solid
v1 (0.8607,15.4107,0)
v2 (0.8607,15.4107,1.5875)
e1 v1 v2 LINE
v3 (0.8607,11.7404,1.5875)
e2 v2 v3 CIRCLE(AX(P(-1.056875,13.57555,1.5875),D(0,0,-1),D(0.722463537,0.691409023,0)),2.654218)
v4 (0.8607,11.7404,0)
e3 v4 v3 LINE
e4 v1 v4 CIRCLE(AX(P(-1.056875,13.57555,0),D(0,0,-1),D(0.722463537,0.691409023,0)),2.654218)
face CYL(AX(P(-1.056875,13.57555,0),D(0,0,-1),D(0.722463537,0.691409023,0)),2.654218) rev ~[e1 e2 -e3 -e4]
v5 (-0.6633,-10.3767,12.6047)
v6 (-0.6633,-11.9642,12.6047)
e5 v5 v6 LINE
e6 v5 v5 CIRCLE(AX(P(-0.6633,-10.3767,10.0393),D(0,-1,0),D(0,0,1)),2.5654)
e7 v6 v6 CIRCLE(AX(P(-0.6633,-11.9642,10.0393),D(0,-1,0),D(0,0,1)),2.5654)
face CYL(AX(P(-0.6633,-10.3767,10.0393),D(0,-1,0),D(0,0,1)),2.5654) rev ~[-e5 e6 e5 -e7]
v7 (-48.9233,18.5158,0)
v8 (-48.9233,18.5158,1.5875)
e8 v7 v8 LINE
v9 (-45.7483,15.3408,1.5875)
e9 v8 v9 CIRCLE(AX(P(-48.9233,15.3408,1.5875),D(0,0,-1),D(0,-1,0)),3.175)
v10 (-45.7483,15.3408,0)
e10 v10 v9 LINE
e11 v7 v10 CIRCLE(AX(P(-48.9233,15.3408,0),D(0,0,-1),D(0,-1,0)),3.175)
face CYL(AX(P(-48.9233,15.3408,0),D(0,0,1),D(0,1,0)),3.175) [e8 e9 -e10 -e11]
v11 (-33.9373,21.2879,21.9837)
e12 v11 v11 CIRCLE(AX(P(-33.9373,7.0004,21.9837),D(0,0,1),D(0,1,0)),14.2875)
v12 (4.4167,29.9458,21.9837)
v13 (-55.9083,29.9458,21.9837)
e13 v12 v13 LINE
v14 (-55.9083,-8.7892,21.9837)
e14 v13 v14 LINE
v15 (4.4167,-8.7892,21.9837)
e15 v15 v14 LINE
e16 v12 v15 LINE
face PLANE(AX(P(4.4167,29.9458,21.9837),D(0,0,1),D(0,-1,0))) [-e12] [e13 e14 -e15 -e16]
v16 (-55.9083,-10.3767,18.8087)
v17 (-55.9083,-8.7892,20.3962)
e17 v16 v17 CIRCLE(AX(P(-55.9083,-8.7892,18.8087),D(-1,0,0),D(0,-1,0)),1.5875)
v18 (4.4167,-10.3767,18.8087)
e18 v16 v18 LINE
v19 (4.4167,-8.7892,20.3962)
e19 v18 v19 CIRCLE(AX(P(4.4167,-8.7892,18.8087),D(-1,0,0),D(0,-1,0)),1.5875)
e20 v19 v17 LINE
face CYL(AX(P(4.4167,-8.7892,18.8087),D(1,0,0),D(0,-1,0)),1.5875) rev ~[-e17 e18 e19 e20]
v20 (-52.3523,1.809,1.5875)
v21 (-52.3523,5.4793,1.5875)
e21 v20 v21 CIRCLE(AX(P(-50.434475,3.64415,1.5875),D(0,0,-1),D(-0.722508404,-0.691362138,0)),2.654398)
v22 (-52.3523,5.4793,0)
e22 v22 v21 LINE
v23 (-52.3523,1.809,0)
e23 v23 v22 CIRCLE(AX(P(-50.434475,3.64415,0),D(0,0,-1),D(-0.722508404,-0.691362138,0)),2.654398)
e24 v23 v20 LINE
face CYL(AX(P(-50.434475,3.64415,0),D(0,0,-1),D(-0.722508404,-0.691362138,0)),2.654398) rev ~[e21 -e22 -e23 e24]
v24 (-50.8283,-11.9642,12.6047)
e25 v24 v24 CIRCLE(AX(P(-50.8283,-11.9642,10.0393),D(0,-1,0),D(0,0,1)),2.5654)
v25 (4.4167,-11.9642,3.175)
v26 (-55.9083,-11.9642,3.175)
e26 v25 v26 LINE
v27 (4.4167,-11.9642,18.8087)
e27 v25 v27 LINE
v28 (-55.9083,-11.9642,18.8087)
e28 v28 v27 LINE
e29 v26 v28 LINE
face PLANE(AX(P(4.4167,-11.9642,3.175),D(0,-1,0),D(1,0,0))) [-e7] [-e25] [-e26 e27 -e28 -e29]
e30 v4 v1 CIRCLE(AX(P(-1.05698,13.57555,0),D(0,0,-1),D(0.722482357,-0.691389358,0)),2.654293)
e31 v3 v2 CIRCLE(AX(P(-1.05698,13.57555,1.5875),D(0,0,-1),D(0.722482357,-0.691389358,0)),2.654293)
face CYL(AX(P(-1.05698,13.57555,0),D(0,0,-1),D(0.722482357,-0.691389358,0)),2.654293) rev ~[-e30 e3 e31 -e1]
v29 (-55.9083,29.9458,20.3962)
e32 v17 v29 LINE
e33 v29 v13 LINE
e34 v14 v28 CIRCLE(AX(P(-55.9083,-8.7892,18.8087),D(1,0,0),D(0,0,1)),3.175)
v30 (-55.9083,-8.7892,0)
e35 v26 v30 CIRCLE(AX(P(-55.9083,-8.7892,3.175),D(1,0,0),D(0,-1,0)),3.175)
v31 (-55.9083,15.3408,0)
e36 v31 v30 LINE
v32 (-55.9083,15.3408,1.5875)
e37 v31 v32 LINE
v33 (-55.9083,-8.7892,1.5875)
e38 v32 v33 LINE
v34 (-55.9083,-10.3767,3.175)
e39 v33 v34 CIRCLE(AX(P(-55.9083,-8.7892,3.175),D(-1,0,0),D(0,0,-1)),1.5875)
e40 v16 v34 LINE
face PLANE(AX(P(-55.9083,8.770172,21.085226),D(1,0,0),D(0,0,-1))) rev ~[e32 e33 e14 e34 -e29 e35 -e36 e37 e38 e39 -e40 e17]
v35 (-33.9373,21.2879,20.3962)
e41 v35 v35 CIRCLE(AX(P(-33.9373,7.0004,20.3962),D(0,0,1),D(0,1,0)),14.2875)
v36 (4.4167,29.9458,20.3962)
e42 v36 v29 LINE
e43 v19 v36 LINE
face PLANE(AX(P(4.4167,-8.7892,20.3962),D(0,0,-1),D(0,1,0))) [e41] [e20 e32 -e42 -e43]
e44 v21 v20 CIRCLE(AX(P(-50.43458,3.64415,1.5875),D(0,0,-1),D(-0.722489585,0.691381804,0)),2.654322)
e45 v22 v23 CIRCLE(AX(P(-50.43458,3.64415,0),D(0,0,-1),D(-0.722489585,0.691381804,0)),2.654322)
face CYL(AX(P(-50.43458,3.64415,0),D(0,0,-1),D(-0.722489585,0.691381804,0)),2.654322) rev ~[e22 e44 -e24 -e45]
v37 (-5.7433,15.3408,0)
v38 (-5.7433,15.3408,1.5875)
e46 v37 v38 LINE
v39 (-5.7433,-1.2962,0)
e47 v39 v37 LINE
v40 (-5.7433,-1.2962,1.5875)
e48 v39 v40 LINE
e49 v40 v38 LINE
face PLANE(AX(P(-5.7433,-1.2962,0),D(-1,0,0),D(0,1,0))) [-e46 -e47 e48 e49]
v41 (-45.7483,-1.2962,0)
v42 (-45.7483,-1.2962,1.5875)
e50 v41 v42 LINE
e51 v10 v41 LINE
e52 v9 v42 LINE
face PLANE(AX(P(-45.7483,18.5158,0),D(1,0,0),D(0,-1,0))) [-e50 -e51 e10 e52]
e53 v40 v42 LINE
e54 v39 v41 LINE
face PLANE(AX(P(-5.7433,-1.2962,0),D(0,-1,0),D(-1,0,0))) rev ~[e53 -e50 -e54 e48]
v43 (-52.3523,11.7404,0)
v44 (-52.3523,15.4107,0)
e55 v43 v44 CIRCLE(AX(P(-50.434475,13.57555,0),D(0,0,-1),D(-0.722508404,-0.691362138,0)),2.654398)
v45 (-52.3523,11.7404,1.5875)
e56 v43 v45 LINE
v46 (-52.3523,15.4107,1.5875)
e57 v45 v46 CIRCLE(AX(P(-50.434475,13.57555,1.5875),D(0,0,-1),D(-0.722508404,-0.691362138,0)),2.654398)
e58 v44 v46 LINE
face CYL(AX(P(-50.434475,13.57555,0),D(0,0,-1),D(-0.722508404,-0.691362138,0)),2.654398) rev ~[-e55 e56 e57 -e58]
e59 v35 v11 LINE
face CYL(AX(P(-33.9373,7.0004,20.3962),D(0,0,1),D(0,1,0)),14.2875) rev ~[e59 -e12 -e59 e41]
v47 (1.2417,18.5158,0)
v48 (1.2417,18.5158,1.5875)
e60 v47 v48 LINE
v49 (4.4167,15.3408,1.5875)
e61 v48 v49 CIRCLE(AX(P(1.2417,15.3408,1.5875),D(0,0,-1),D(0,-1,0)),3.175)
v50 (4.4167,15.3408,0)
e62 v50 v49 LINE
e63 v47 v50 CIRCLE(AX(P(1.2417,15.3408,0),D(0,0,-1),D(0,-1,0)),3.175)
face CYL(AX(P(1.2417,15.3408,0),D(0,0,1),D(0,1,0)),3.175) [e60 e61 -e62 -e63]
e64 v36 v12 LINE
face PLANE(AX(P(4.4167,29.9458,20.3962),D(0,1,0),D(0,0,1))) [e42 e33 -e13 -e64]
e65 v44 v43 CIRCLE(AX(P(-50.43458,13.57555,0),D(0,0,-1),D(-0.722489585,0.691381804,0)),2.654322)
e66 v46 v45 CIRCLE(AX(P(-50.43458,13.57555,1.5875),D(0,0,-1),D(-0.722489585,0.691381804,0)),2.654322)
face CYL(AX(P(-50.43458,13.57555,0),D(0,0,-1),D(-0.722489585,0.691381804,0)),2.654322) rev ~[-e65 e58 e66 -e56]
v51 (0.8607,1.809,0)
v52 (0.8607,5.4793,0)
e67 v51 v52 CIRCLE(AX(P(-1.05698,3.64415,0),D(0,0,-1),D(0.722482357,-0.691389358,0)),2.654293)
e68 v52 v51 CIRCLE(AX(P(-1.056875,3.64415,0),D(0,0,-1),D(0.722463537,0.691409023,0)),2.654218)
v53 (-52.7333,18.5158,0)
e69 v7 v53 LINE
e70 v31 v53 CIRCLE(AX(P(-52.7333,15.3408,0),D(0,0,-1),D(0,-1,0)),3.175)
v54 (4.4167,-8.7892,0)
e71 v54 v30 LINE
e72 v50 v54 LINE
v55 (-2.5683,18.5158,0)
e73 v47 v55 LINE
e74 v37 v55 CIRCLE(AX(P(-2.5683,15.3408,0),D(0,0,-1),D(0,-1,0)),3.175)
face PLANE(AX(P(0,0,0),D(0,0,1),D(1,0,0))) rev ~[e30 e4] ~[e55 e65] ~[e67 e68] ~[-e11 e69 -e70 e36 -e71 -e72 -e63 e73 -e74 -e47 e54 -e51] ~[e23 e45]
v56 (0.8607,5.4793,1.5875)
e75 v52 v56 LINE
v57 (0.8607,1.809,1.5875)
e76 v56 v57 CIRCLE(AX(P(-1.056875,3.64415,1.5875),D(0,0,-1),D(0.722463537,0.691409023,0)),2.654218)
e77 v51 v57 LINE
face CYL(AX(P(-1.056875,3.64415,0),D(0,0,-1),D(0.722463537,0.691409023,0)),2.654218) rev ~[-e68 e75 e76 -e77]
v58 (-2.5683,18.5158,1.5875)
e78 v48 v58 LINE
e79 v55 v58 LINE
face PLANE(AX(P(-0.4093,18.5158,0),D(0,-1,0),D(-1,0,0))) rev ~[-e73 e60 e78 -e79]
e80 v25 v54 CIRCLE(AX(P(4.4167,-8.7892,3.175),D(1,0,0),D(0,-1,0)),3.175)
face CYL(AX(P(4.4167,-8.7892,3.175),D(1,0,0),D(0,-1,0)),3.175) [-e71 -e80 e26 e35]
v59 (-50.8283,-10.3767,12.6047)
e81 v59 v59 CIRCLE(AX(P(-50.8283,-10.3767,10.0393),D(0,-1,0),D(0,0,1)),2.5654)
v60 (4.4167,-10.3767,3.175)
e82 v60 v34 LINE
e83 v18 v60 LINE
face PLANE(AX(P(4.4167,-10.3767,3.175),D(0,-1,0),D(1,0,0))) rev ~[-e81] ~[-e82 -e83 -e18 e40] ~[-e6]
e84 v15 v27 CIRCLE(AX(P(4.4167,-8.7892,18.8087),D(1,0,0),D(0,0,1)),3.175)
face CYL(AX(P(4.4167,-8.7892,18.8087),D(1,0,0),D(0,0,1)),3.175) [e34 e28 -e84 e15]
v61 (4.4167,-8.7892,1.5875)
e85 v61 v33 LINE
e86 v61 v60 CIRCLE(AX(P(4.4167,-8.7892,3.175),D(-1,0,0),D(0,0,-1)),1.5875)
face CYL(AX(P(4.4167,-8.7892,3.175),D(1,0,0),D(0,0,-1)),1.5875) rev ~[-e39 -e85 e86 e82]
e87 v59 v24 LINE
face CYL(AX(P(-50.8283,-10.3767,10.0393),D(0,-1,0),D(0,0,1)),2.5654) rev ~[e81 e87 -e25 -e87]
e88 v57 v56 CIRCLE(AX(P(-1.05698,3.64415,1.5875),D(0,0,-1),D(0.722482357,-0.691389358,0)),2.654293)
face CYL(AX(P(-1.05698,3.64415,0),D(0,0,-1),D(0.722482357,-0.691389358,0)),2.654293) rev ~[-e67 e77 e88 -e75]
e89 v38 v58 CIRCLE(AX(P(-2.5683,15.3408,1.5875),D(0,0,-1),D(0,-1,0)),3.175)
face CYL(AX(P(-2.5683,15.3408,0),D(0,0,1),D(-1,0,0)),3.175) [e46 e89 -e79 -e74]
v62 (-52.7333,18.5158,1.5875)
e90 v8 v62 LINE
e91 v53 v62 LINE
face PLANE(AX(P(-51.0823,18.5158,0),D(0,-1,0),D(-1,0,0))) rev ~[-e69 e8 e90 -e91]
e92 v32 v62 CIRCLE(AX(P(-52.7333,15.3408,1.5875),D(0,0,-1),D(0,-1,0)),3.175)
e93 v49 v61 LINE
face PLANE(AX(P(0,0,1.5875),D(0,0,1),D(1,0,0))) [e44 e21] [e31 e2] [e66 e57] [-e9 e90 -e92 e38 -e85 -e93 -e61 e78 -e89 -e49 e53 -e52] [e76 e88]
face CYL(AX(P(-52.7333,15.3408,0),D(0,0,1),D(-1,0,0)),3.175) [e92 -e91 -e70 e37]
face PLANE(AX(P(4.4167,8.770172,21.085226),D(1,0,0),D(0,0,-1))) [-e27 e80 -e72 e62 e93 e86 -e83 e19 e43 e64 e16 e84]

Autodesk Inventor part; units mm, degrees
ref_plane "YZ Plane" through (0, 0, 0) normal (1, 0, 0) x (0, 1, 0)
ref_plane "Work Plane1" through (-25.7458, -64.4152, -12.319) normal (0, -1, 0) x (0, 0, -1)
ref_plane "Work Plane2" through (0, 0, 0) normal (0, 0, 1) x (1, 0, 0)
sketch "Sketch1" plane through (0, 0, 0) normal (0, 0, 1) x (1, 0, 0)
  line L0 (-0.4093, 18.5158) -> (-5.7433, 18.5158) projected
  line L1 (-5.7433, -1.2962) -> (-5.7433, 18.5158) projected
  line L2 (-45.7483, 18.5158) -> (-51.0823, 18.5158) projected
  line L3 (-45.7483, 18.5158) -> (-45.7483, -1.2962) projected
  line L4 (-5.7433, 18.5158) -> (4.4167, 18.5158)
  line L5 (4.4167, 18.5158) -> (4.4167, -11.9642)
  line L6 (-45.7483, 18.5158) -> (-55.9083, 18.5158)
  line L7 (-55.9083, 18.5158) -> (-55.9083, -11.9642)
  line L8 (-55.9083, -11.9642) -> (4.4167, -11.9642)
  line L9 (-5.7433, -1.2962) -> (-45.7483, -1.2962)
  point P0 (0, 0)
  dimension "d0" = 10.16
  dimension "d1" = 30.48
  dimension "d2" = 10.16
extrude "Extrusion1" add sketch "Sketch1" along normal blind 1.5875
fillet "Corner Round1" radius 3.175 4 edges at (4.4167, 18.5158, 0.7937) (-5.7433, 18.5158, 0.7937) (-45.7483, 18.5158, 0.7937) (-55.9083, 18.5158, 0.7937)
sketch "Sketch2" plane through (4.4167, -10.3767, 0) normal (0, -1, 0) x (1, 0, 0)
  line L0 (-60.325, 0) -> (0, 0)
  line L1 (0, 0) -> (0, 16.9037)
  line L2 (0, 16.9037) -> (-60.325, 16.9037)
  line L3 (-60.325, 16.9037) -> (-60.325, 0)
edge flange "Flange1" height 16.9037 angle 90 thickness 1.5875 bend radius 1.5875 thickness toward (0, -1, 0) relief straight relief width 1.5875 relief depth 0.7937 edges at (-25.7458, -11.9642, 1.5875) wall of the first edge with corners at (-55.9083, -10.3767, 0) (4.4167, -10.3767, 0) (4.4167, -10.3767, 16.9037) (-55.9083, -10.3767, 16.9037)
bend "Bend1"
corner "Corner1"
sketch "Sketch4" plane through (0, 0, 0) normal (0, 0, -1) x (-1, 0, 0)
  arc A0 (-0.8607, 1.809) -> (-0.8607, 5.4793) centre (1.057, 3.6441) ccw projected
  arc A1 (-0.8607, 11.7404) -> (-0.8607, 15.4107) centre (1.057, 13.5755) ccw projected
  arc A2 (52.3523, 15.4107) -> (52.3523, 11.7404) centre (50.4346, 13.5755) ccw projected
  arc A3 (52.3523, 5.4793) -> (52.3523, 1.809) centre (50.4346, 3.6441) ccw projected
  arc A4 (52.3523, 1.809) -> (52.3523, 5.4793) centre (50.4346, 3.6441) ccw
  arc A5 (52.3523, 11.7404) -> (52.3523, 15.4107) centre (50.4346, 13.5755) ccw
  arc A6 (-0.8607, 5.4793) -> (-0.8607, 1.809) centre (1.057, 3.6441) ccw
  arc A7 (-0.8607, 15.4107) -> (-0.8607, 11.7404) centre (1.057, 13.5755) ccw
  point P0 (0, 0)
extrude "Extrusion2" cut sketch "Sketch4" against normal up to surface (1.5875 mm away)
ref_plane "Work Plane4" through (4.4167, -10.3767, 3.175) normal (0, 1, 0) x (1, 0, 0)
sketch "Sketch8" plane through (4.4167, -10.3767, 3.175) normal (0, 1, 0) x (1, 0, 0)
  line L0 (12.7, -13.7287) -> (-73.025, -13.7287) projected
  line L1 (0, 0) -> (-0.1034, -13.7287)
  line L2 (-60.325, 0) -> (0, 0) projected
  line L3 (-60.325, 0) -> (-60.325, -13.7287)
  line L4 (-3.175, 1.5875) -> (-6.985, 1.5875) projected
  line L5 (-5.08, 1.5875) -> (-5.08, -6.8643)
  line L6 (-5.08, -6.8643) -> (0, -6.8644)
  line L7 (0, -13.7287) -> (0, 0) projected
  line L8 (-53.34, 1.5875) -> (-57.15, 1.5875) projected
  line L9 (-55.245, 1.5875) -> (-55.245, -6.8644)
  point P0 (-4.4167, 3.175)
ref_plane "Work Plane3" through (4.4167, -11.9642, 3.175) normal (0, -1, 0) x (1, 0, 0)
sketch "Sketch9" plane through (4.4167, -11.9642, 3.175) normal (0, -1, 0) x (1, 0, 0)
  line L0 (12.7, 13.7287) -> (-73.025, 13.7287) projected
  line L1 (0, 13.7287) -> (-60.325, 13.7287)
  line L2 (-60.325, 13.7287) -> (-60.325, 18.8087)
  line L3 (-60.325, 18.8087) -> (0, 18.8087)
  line L4 (0, 18.8087) -> (0, 13.7287)
  line L5 (-60.325, 13.7287) -> (-60.325, 0) projected
  line L6 (0, 13.7287) -> (0, 0) projected
  point P0 (-4.4167, -3.175)
  dimension "d57" = 5.08
extrude "Extrusion6" add sketch "Sketch9" against normal blind 1.5875
sketch "Sketch11" plane through (4.4167, -11.9642, 20.3962) normal (0, 0, 1) x (1, 0, 0)
  line L0 (-60.325, 0) -> (0, 0)
  line L1 (0, 0) -> (0, 41.91)
  line L2 (0, 41.91) -> (-60.325, 41.91)
  line L3 (-60.325, 41.91) -> (-60.325, 0)
edge flange "Flange4" height 41.91 angle 90 thickness 1.5875 bend radius 1.5875 thickness toward (0, 0, 1) relief straight relief width 1.5875 relief depth 0.7937 edges at (-25.7458, -10.3767, 21.9837) wall of the first edge with corners at (-55.9083, -11.9642, 20.3962) (4.4167, -11.9642, 20.3962) (4.4167, 29.9458, 20.3962) (-55.9083, 29.9458, 20.3962)
bend "Bend4"
corner "Corner4"
hole "Hole1" at (-0.6633, -10.3767, 10.0393) at (-50.8283, -10.3767, 10.0393) direction (0, -1, 0) diameter 5.1308 end through all
sketch "Sketch12" plane through (4.4167, 29.9458, 20.3962) normal (0, 0, -1) x (-1, 0, 0)
  line L0 (38.354, 0.0162) -> (38.354, -22.9454)
  line L1 (60.325, 0) -> (60.325, -38.735) projected
  point P0 (4.4167, -29.9458)
  dimension "d65" = 22.9616
  dimension "d66" = 21.971
hole "Hole2" at (-33.9373, 7.0004, 20.3962) direction (0, 0, 1) diameter 28.575 end through all
equation "\"d63\" = Thickness"
equation "\"d72\" = Thickness"
equation "\"d6\" = BendReliefWidth"
equation "\"d7\" = BendReliefDepth"
equation "\"d8\" = MinimumRemnant"
equation "\"d9\" = BendRadius"
equation "\"d12\" = BendRadius"
equation "\"d13\" = CornerReliefSize"
equation "\"d14\" = GapSize"
equation "\"d15\" = JacobiRadiusSize"
equation "\"d47\" = BendReliefWidth"
equation "\"d48\" = BendReliefDepth"
equation "\"d49\" = MinimumRemnant"
equation "\"d50\" = BendRadius"
equation "\"d53\" = BendRadius"
equation "\"d54\" = CornerReliefSize"
equation "\"d55\" = GapSize"
equation "\"d56\" = JacobiRadiusSize"
equation "\"BendRadius\" = Thickness"
equation "\"BendReliefWidth\" = Thickness"
equation "\"BendReliefDepth\" = 0.5 * Thickness"
equation "\"CornerReliefSize\" = 4 * Thickness"
equation "\"MinimumRemnant\" = 2 * Thickness"
equation "\"TransitionRadius\" = BendRadius"
equation "\"JacobiRadiusSize\" = Thickness"
equation "\"GapSize\" = Thickness"
equation "\"Thickness\" = 1.5875"
properties part number "HSmountLEFT"
